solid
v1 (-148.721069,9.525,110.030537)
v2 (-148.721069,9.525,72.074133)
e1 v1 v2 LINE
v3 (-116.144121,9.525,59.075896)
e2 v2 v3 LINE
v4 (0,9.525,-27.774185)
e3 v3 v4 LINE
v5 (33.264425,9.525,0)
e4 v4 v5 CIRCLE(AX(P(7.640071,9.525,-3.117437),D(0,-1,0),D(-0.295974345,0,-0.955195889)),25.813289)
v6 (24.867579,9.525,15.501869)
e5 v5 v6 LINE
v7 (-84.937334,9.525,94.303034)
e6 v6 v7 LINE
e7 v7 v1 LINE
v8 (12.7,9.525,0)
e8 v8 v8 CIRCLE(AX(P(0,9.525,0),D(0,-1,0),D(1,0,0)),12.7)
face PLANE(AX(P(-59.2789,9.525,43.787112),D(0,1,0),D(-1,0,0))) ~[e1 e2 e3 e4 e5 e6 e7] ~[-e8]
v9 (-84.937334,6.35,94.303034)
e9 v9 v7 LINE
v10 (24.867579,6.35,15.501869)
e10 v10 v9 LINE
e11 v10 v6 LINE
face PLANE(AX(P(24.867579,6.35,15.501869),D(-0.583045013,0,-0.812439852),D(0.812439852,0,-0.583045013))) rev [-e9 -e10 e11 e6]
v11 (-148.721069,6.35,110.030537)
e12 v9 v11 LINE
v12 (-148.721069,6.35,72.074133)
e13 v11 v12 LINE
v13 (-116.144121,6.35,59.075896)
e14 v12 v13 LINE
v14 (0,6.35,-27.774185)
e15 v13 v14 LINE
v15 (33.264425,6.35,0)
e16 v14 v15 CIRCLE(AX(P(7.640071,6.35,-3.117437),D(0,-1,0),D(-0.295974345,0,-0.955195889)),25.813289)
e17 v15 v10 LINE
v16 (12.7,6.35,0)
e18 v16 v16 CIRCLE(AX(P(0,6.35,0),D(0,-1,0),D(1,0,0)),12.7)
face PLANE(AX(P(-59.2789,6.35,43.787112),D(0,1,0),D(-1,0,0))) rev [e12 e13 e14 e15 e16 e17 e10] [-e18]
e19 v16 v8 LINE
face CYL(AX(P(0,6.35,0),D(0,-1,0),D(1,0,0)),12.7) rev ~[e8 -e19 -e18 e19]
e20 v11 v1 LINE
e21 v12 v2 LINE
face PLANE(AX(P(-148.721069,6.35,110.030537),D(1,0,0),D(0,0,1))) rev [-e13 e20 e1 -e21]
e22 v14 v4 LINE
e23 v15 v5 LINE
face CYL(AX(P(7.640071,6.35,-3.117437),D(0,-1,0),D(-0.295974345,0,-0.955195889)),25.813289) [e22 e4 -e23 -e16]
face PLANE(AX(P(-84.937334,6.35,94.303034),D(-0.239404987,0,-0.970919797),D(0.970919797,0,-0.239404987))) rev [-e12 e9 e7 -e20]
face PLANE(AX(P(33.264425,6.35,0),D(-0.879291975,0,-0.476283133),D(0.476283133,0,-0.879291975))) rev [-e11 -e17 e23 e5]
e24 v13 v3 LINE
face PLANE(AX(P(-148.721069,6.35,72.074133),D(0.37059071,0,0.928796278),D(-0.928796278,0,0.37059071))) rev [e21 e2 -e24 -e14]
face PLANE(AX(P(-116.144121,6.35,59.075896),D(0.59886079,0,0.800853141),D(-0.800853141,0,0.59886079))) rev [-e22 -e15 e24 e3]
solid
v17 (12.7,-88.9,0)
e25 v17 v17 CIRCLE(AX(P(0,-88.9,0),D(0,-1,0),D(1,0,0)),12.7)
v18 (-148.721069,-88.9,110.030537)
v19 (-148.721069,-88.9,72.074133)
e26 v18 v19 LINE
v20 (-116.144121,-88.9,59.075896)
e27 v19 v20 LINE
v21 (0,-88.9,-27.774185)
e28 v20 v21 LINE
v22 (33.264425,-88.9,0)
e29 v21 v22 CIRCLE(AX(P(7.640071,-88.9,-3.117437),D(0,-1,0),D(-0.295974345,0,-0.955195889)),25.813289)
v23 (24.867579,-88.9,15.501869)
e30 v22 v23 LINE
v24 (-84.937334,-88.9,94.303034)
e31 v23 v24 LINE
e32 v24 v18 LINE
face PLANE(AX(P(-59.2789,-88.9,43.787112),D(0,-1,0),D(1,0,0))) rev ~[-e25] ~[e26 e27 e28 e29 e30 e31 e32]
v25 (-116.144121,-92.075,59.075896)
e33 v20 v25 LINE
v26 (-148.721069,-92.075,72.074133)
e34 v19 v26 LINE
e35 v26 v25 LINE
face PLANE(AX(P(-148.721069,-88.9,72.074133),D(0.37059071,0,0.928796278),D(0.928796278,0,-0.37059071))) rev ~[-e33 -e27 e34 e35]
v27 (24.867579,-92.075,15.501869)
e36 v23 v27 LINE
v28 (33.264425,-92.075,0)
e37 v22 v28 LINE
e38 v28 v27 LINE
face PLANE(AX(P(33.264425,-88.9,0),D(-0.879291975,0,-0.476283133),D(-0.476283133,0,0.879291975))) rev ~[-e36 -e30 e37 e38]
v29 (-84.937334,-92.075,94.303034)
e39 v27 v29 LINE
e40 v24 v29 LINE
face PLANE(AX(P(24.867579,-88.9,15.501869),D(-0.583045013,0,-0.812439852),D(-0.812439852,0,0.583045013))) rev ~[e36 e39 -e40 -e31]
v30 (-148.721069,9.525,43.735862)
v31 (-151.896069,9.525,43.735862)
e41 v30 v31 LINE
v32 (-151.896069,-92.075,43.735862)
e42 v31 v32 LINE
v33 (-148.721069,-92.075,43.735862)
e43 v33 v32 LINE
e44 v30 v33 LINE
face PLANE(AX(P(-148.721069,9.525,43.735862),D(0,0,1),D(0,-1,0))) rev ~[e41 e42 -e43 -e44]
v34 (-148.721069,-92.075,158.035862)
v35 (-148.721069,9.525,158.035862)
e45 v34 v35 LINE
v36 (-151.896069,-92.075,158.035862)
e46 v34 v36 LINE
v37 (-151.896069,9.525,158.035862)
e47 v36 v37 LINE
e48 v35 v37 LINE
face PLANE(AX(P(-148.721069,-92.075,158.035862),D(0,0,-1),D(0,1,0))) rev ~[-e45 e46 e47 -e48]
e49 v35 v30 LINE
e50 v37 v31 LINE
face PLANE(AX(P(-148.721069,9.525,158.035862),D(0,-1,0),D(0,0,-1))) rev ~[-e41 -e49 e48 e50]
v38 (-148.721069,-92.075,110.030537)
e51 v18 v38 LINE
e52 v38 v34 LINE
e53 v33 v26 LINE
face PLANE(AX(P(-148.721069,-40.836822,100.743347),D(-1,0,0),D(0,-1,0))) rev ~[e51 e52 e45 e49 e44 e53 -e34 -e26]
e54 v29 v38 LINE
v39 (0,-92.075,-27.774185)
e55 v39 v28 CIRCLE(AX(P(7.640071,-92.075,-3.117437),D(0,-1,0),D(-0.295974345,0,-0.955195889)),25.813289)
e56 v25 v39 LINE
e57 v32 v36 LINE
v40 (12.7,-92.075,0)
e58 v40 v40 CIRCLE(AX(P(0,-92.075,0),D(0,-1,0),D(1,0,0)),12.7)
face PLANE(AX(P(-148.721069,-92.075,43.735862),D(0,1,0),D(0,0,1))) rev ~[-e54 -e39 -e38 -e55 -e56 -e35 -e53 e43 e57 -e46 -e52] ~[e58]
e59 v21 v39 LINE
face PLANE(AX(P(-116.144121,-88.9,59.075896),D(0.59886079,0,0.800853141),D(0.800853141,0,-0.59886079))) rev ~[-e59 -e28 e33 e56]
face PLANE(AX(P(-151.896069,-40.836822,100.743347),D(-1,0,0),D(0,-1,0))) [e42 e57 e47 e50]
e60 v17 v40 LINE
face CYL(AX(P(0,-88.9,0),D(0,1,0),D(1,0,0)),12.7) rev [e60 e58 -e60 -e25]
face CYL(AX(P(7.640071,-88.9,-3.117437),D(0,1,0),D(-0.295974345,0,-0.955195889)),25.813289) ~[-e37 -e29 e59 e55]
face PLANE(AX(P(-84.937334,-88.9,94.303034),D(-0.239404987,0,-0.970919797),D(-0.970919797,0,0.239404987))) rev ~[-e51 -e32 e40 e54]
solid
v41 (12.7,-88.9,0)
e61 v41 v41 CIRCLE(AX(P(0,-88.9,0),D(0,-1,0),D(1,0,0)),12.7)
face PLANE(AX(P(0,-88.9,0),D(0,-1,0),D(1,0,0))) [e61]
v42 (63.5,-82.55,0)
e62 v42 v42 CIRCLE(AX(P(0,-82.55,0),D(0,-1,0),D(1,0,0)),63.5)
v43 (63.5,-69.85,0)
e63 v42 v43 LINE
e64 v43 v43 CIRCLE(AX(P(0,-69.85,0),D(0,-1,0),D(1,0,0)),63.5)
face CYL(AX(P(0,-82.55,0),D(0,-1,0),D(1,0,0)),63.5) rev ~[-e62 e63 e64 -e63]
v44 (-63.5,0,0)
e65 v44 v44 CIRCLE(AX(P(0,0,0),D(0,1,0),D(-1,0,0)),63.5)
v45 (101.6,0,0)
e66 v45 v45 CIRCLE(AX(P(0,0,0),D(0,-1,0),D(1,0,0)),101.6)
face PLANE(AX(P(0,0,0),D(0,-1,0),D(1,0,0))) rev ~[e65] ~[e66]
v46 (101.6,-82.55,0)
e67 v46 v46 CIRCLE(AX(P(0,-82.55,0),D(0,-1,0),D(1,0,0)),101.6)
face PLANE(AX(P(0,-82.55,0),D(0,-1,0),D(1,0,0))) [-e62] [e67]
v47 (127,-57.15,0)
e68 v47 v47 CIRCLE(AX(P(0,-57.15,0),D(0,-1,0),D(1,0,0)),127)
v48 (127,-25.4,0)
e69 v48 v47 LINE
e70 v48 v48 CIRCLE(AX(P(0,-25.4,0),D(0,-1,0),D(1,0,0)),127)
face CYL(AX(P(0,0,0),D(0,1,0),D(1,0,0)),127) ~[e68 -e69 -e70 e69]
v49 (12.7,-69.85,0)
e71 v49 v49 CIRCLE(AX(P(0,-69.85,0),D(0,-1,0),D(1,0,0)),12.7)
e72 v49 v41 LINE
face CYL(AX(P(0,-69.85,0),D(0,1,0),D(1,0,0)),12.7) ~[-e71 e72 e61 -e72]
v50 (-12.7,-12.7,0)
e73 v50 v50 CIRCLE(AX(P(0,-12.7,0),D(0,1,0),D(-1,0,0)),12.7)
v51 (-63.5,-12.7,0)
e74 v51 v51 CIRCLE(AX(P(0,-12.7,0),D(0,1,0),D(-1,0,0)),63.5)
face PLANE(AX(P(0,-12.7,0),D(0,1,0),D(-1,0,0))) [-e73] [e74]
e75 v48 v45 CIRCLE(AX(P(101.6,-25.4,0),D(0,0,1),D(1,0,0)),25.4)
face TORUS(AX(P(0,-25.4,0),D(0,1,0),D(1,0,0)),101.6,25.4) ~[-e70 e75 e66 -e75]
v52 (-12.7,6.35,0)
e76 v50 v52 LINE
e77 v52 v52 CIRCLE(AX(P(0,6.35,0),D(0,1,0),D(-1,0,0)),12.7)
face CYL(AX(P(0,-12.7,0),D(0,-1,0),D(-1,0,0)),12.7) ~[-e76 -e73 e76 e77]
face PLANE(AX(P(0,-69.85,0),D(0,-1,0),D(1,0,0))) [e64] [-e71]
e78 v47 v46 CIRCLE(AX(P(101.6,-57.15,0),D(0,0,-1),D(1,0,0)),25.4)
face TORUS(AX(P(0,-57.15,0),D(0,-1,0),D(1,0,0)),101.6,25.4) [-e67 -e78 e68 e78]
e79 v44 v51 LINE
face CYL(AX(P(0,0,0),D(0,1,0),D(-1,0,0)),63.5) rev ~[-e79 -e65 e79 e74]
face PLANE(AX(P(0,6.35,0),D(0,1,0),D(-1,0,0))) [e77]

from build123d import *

# Parameters (mm, degrees)
F0_R      = 127
F1_DEPTH  = 82.55
F2_R      = 25.4
F3_R      = 63.5
F4_DEPTH  = 12.7
F5_R      = 63.5
F7_DEPTH  = 12.7
F8_R      = 12.7
F9_DEPTH  = 19.05
F10_R     = 12.7
F11_DEPTH = 19.05
F12_R     = 12.7
F13_DEPTH = 3.175
F15_W     = 3.175
F15_H     = 37.9564044358
F16_DEPTH = 3.175


# Not quite as in the source:
# - a length typed as a fraction of an inch, garbled in the dataset ("3 / 203.2 mm" for 3/8 in), is restored


with BuildPart() as f1:
    # F0 (on Front) → F1 (new body)
    with BuildSketch(Plane.XZ):
        Circle(F0_R)
    extrude(amount=F1_DEPTH)

    # F2
    f2_edges = [f1.edges().sort_by_distance(p)[0] for p in [
        (-127, 0, 0),
        (-127, -82.55, 0),
    ]]
    fillet(f2_edges, radius=F2_R)

    # F3 (on face) → F4 (cut)
    with BuildSketch(Plane.XZ.offset(82.55)):
        Circle(F3_R)
    extrude(amount=-F4_DEPTH, mode=Mode.SUBTRACT)

    # F5 (on face) → F7 (cut)
    with BuildSketch(Plane(origin=(0, 0, 0), x_dir=(-1, 0, 0), z_dir=(0, 1, 0))):
        Circle(F5_R)
    extrude(amount=-F7_DEPTH, mode=Mode.SUBTRACT)

    # F8 (on face) → F9 (join)
    with BuildSketch(Plane(origin=(0, -12.7, 0), x_dir=(-1, 0, 0), z_dir=(0, 1, 0))):
        Circle(F8_R)
    extrude(amount=F9_DEPTH)

    # F10 (on face) → F11 (join)
    with BuildSketch(Plane.XZ.offset(69.85)):
        Circle(F10_R)
    extrude(amount=F11_DEPTH)


with BuildPart() as f13:
    # F12 (on face) → F13 (new body)
    with BuildSketch(Plane.XZ.offset(88.9)):
        with BuildLine():
            Line((-116.1441206932, 59.0758956969), (0, -27.7741849422))
            ThreePointArc((0, -27.7741849422), (24.1842527019, -22.9319763652), (33.2644246519, 0))
            Line((33.2644246519, 0), (24.8675793409, 15.5018689111))
            Line((24.8675793409, 15.5018689111), (-84.9373340607, 94.303034246))
            Line((-84.9373340607, 94.303034246), (-148.7210690975, 110.0305374596))
            Line((-148.7210690975, 110.0305374596), (-148.7210690975, 72.0741330239))
            Line((-148.7210690975, 72.0741330239), (-116.1441206932, 59.0758956969))
        make_face()
        Circle(F12_R, mode=Mode.SUBTRACT)
    extrude(amount=F13_DEPTH)


with BuildPart() as f14_1:
    # F14: instance of F13
    add(f13.part.mirror(Plane.XZ.offset(41.275)))


with BuildPart() as f13_1:
    add(f13.part)

    # F15 (on face) → F16 (join)
    with BuildSketch(Plane(origin=(-148.7210690975, 0, 0), x_dir=(0, -1, 0), z_dir=(-1, 0, 0))):
        Polygon((-9.525, 72.0741330239), (-9.525, 43.7358616628), (92.075, 43.7358616628), (92.075, 158.0358616628), (-9.525, 158.0358616628), (-9.525, 110.0305374596), (-6.35, 110.0305374596), (-6.35, 72.0741330239), align=None)
        with Locations((-7.9375, 91.0523352418)):
            Rectangle(F15_W, F15_H)
    extrude(amount=F16_DEPTH)


solid = Compound([f1.part, f14_1.part, f13_1.part])
